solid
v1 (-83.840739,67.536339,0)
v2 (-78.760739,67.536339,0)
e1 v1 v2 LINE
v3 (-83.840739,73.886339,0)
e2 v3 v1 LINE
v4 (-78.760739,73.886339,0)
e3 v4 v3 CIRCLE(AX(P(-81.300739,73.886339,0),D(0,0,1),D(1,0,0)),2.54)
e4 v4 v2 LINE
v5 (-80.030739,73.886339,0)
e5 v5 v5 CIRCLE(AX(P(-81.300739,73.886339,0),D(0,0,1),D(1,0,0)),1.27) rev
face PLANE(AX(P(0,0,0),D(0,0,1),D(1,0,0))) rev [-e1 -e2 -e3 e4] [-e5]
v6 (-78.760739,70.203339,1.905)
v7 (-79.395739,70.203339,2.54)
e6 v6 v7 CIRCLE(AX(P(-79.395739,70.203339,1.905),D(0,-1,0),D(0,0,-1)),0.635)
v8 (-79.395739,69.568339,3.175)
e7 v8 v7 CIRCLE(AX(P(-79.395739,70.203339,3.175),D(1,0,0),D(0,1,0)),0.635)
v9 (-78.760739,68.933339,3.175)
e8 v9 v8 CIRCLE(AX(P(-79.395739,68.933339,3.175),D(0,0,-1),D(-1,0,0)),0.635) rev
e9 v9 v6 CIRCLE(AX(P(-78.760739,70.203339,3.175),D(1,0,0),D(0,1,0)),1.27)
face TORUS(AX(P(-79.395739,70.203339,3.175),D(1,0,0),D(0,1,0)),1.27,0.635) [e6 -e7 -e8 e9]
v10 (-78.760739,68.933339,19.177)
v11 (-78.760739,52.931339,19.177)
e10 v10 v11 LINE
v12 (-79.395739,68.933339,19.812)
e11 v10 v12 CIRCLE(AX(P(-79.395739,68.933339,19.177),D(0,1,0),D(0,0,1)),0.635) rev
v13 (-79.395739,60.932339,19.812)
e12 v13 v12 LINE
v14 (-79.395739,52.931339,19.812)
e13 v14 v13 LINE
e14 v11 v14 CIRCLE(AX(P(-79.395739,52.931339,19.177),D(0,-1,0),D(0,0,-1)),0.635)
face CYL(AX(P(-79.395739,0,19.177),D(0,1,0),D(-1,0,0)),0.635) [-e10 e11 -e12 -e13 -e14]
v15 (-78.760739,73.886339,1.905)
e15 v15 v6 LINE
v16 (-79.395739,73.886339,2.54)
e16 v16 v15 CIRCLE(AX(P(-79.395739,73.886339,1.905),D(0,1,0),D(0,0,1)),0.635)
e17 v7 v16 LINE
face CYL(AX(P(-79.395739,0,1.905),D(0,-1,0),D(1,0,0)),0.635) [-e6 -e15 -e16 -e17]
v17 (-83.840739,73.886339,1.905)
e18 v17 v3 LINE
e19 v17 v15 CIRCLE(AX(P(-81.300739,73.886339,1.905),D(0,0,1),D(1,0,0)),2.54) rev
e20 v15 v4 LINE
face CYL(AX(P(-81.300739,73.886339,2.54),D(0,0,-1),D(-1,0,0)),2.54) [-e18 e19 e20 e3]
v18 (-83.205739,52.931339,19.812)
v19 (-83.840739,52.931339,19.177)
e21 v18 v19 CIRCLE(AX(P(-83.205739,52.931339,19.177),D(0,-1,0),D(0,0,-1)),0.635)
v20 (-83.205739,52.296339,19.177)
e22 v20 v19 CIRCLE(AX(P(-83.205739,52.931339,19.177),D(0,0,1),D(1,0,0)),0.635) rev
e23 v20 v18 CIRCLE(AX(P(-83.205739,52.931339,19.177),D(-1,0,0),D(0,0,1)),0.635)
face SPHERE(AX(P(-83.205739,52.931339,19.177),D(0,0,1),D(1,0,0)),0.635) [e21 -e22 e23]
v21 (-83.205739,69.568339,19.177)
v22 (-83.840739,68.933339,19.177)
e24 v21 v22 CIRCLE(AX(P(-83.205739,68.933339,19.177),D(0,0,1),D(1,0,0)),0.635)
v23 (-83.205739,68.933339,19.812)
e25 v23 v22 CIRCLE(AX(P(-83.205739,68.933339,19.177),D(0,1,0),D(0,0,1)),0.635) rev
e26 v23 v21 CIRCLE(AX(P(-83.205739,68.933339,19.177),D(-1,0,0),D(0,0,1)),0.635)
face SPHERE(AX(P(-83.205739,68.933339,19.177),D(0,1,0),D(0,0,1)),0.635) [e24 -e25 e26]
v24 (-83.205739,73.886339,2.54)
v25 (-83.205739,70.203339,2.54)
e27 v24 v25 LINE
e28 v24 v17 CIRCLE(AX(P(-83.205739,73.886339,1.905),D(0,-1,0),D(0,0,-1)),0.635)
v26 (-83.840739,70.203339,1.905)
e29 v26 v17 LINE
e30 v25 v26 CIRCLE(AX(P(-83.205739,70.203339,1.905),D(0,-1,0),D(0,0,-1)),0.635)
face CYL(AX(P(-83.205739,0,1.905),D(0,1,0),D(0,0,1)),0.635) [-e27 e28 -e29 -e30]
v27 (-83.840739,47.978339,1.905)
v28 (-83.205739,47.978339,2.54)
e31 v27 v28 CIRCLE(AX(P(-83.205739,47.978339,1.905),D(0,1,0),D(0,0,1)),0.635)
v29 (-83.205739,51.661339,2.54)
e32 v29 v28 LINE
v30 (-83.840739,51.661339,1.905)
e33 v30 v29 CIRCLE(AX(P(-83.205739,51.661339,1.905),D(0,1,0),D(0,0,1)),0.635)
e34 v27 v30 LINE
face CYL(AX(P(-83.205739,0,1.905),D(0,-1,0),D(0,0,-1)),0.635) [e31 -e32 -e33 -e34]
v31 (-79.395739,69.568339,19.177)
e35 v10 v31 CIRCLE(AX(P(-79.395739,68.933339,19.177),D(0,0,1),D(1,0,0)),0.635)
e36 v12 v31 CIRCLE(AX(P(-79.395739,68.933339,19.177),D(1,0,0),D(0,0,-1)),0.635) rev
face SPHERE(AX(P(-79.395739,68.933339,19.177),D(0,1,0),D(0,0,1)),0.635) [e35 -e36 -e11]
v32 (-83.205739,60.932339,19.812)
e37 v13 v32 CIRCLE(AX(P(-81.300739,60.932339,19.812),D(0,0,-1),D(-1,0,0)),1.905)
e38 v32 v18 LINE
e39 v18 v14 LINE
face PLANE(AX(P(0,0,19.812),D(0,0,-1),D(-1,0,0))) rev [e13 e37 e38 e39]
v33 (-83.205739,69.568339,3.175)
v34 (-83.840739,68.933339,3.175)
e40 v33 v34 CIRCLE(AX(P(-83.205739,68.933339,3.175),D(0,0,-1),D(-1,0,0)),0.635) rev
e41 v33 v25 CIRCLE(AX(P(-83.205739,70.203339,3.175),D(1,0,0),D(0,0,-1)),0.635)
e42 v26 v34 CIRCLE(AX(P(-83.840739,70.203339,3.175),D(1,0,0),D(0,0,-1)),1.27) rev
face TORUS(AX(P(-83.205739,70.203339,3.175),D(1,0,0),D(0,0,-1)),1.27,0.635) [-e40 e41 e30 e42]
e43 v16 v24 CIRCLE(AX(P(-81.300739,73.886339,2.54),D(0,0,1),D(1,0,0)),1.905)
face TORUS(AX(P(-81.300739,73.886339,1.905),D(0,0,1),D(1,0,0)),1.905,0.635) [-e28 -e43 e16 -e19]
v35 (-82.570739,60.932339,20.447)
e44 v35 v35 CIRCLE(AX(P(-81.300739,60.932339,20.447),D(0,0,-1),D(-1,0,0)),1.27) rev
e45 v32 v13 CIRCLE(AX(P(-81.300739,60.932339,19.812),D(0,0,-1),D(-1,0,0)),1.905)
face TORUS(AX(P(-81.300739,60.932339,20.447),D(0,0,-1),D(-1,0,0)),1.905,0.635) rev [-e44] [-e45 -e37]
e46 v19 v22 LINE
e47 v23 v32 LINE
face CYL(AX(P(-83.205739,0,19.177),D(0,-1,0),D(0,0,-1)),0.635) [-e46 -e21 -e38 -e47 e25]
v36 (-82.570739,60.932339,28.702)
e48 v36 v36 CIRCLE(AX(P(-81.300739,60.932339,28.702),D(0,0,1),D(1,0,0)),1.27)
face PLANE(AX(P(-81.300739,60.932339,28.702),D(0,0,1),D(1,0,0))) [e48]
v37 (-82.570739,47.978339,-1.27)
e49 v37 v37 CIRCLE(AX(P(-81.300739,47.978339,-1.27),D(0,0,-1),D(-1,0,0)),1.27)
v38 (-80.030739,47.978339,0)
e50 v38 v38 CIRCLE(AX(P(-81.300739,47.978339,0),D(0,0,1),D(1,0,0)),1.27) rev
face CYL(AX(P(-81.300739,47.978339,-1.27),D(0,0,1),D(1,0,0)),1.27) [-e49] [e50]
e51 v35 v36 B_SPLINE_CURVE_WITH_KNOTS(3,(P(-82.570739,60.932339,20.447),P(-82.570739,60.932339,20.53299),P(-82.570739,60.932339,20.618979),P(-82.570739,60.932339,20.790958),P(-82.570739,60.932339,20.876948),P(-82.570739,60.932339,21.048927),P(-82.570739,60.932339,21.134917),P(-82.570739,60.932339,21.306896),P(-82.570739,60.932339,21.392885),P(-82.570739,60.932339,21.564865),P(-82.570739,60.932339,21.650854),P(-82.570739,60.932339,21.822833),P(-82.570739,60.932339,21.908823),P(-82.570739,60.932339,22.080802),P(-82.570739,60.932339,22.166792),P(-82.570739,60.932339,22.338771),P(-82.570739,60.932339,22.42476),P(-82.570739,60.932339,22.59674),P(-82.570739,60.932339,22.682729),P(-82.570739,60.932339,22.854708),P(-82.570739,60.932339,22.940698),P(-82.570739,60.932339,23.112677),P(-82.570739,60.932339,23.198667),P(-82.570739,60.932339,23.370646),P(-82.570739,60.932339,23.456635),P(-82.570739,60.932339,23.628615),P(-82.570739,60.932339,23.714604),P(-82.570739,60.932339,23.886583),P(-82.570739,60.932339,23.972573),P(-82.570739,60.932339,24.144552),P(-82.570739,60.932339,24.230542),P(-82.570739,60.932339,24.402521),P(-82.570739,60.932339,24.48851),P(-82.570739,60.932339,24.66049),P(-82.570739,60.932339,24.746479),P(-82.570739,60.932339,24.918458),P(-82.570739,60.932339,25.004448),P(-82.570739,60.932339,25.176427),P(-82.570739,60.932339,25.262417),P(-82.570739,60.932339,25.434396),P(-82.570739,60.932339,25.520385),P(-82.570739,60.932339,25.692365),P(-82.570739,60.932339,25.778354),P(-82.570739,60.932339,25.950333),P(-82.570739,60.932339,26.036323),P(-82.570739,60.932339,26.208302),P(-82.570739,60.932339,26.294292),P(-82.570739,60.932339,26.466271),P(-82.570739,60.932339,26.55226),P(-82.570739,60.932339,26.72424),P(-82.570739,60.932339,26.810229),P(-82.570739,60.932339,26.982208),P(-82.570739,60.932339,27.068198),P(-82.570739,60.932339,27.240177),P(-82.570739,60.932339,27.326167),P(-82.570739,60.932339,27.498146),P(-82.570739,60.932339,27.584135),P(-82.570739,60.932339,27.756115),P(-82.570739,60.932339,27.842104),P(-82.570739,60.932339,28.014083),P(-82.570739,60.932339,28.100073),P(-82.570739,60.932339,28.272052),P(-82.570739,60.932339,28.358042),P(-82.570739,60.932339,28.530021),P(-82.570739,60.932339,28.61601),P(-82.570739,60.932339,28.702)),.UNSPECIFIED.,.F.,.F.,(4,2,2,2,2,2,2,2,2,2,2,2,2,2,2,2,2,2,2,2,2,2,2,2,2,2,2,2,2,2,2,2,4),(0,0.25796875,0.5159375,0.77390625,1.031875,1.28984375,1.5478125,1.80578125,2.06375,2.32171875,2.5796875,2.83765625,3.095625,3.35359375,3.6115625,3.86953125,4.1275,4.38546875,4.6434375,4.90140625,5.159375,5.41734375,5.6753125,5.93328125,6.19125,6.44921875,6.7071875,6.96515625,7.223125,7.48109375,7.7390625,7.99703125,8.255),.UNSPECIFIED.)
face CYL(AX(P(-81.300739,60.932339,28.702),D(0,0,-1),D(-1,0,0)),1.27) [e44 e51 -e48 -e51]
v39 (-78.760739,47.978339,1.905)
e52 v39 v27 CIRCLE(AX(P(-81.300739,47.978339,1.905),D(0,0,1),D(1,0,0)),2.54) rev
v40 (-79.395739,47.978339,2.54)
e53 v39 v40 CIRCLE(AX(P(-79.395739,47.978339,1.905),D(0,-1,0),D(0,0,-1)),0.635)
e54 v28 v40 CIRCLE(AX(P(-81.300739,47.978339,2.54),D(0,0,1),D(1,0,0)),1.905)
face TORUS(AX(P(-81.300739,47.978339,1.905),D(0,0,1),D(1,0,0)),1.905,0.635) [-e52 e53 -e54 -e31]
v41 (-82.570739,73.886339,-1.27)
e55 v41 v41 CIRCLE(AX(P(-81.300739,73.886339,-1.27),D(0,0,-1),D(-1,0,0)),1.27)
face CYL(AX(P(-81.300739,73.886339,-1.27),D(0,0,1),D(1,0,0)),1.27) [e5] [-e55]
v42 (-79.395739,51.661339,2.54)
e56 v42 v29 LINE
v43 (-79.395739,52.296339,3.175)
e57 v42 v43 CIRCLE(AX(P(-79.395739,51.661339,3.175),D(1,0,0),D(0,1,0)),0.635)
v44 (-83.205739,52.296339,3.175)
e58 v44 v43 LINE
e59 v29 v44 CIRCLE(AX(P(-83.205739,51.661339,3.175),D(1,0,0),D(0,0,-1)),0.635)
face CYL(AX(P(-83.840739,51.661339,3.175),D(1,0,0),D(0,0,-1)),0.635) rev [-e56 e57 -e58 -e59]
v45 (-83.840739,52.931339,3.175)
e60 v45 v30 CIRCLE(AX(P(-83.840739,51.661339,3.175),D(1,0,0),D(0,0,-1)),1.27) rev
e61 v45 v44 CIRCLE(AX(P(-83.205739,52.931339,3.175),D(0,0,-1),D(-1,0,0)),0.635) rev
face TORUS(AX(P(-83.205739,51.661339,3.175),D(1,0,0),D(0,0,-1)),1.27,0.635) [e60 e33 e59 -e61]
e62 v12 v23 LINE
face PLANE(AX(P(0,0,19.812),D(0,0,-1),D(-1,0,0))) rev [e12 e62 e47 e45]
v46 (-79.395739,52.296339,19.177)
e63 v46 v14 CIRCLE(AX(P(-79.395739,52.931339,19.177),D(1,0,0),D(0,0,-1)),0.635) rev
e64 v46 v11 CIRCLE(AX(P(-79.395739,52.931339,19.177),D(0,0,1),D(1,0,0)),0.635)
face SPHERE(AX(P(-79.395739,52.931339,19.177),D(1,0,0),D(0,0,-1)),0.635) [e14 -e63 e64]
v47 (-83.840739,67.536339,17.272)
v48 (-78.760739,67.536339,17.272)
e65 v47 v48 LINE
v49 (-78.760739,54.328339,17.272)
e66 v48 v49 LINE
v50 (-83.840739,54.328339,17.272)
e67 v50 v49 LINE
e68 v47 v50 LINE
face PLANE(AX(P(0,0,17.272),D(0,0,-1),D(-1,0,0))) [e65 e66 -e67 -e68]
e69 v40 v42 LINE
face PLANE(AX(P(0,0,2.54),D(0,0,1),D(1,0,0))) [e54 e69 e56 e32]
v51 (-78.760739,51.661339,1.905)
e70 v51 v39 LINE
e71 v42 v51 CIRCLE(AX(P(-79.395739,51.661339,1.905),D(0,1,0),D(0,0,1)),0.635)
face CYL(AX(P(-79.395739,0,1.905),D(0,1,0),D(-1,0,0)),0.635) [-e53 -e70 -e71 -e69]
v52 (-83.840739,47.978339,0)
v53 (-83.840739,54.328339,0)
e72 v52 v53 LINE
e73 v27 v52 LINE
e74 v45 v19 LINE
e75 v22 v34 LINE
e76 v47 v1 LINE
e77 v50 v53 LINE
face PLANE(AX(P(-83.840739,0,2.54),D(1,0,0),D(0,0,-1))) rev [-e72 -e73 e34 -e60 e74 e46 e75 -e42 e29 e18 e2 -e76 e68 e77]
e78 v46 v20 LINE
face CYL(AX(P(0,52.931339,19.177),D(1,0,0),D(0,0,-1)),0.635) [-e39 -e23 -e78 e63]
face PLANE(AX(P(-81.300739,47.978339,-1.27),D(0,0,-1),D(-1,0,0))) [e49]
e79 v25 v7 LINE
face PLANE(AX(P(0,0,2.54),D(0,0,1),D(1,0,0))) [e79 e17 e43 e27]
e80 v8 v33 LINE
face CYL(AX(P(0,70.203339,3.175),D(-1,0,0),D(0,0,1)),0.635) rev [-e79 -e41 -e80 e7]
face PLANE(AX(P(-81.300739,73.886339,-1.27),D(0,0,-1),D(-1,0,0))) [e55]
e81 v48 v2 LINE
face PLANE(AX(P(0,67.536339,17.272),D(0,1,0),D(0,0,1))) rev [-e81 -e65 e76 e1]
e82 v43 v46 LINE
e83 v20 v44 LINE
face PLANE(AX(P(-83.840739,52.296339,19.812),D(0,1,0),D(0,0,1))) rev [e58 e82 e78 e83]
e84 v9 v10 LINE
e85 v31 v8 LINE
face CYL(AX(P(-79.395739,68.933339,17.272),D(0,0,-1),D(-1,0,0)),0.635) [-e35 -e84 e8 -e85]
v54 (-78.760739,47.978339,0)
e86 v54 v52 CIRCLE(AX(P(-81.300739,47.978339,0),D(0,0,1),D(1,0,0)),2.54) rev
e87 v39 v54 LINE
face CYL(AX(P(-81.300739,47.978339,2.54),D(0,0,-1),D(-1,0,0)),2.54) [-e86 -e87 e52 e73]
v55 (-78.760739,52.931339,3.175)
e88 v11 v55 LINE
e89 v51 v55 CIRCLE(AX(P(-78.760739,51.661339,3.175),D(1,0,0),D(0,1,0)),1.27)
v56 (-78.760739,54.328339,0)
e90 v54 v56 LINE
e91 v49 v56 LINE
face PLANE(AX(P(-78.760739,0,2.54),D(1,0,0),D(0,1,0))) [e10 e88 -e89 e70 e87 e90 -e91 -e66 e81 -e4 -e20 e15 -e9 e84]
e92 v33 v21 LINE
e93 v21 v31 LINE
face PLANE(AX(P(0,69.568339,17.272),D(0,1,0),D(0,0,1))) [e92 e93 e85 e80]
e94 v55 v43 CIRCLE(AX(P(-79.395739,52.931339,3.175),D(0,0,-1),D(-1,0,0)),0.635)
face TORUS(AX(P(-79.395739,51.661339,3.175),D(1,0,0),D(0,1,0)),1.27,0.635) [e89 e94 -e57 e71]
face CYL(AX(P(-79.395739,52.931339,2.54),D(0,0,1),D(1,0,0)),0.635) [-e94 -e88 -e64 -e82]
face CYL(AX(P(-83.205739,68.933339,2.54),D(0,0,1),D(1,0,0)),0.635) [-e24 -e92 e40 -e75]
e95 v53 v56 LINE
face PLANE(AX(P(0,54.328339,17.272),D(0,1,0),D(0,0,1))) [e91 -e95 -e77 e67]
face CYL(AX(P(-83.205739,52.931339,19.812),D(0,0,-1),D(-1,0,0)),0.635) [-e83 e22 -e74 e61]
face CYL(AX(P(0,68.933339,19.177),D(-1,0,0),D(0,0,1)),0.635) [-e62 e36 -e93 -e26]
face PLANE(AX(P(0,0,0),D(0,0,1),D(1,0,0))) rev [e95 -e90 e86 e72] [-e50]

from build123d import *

# Parameters (mm, degrees)
BOSS_EXTRUDE1_DEPTH = 2.54
SKETCH1_7_W         = 5.08
SKETCH1_7_H         = 2.032
BOSS_EXTRUDE2_DEPTH = 17.272
SKETCH2_W           = 5.08
SKETCH2_H           = 17.272
BOSS_EXTRUDE3_DEPTH = 2.54
SKETCH3_R           = 1.27
BOSS_EXTRUDE4_DEPTH = 8.89
FILLET1_R           = 0.635
SKETCH4_R           = 1.27
BOSS_EXTRUDE5_DEPTH = 1.27


with BuildPart() as part:
    # Sketch1 → Boss-Extrude1 (new body)
    with BuildSketch(Plane.XY):
        with BuildLine():
            ThreePointArc((-78.760738581, 73.886338755), (-81.300738581, 71.346338755), (-83.840738581, 73.886338755))
            Line((-83.840738581, 73.886338755), (-83.840738581, 69.568338755))
            Line((-83.840738581, 69.568338755), (-78.760738581, 69.568338755))
            Line((-78.760738581, 69.568338755), (-78.760738581, 73.886338755))
        make_face()
        with BuildLine():
            ThreePointArc((-78.760738581, 73.886338755), (-81.300738581, 76.426338755), (-83.840738581, 73.886338755))
            Line((-83.840738581, 73.886338755), (-78.760738581, 73.886338755))
        make_face()
        with BuildLine():
            Line((-78.760738581, 73.886338755), (-83.840738581, 73.886338755))
            ThreePointArc((-83.840738581, 73.886338755), (-81.300738581, 71.346338755), (-78.760738581, 73.886338755))
        make_face()
        with BuildLine():
            ThreePointArc((-78.760738581, 47.978338755), (-81.300738581, 50.518338755), (-83.840738581, 47.978338755))
            Line((-83.840738581, 47.978338755), (-78.760738581, 47.978338755))
        make_face()
        with BuildLine():
            Line((-78.760738581, 47.978338755), (-83.840738581, 47.978338755))
            ThreePointArc((-83.840738581, 47.978338755), (-81.300738581, 45.438338755), (-78.760738581, 47.978338755))
        make_face()
        with BuildLine():
            Line((-78.760738581, 52.296338755), (-83.840738581, 52.296338755))
            Line((-83.840738581, 52.296338755), (-83.840738581, 47.978338755))
            ThreePointArc((-83.840738581, 47.978338755), (-81.300738581, 50.518338755), (-78.760738581, 47.978338755))
            Line((-78.760738581, 47.978338755), (-78.760738581, 52.296338755))
        make_face()
    extrude(amount=BOSS_EXTRUDE1_DEPTH)

    # Sketch1<7> → Boss-Extrude2 (add)
    with BuildSketch(Plane.XY):
        with Locations((-81.300738581, 53.312338755)):
            Rectangle(SKETCH1_7_W, SKETCH1_7_H)
        Polygon((-78.760738581, 69.568338755), (-83.840738581, 69.568338755), (-83.840738581, 67.536338755), (-82.574456105, 67.536338755), (-78.760738581, 67.536338755), align=None)
    extrude(amount=BOSS_EXTRUDE2_DEPTH)

    # Sketch2 → Boss-Extrude3 (add)
    with BuildSketch(Plane.XY.offset(17.272)):
        with Locations((-81.300738581, 60.932338755)):
            Rectangle(SKETCH2_W, SKETCH2_H)
    extrude(amount=BOSS_EXTRUDE3_DEPTH)

    # Sketch3 → Boss-Extrude4 (add)
    with BuildSketch(Plane.XY.offset(19.812)):
        with Locations(Location((-81.300738581, 60.932338755, 0), (0, 0, 180))):
            Circle(SKETCH3_R)
    extrude(amount=BOSS_EXTRUDE4_DEPTH)

    # Fillet1
    fillet1_edges = [part.edges().sort_by_distance(p)[0] for p in [
        (-81.300738581, 76.426338755, 2.54),
        (-83.840738581, 71.727338755, 2.54),
        (-78.760738581, 69.568338755, 11.176),
        (-83.840738581, 69.568338755, 11.176),
        (-81.300738581, 69.568338755, 2.54),
        (-83.840738581, 52.296338755, 11.176),
        (-78.760738581, 60.932338755, 19.812),
        (-78.760738581, 52.296338755, 11.176),
        (-81.300738581, 69.568338755, 19.812),
        (-81.300738581, 52.296338755, 19.812),
        (-83.840738581, 60.932338755, 19.812),
        (-81.300738581, 45.438338755, 2.54),
        (-83.840738581, 50.137338755, 2.54),
        (-78.760738581, 50.137338755, 2.54),
        (-81.300738581, 52.296338755, 2.54),
        (-78.760738581, 71.727338755, 2.54),
        (-80.030738581, 60.932338755, 19.812),
    ]]
    fillet(fillet1_edges, radius=FILLET1_R - 0.0001)  # a hair under: the kernel refuses the full size

    # Sketch4 → Boss-Extrude5 (add)
    with BuildSketch(Plane(origin=(0, 0, 0), x_dir=(-1, 0, 0), z_dir=(0, 0, -1))):
        with Locations(Location((81.300738581, 73.886338755, 0), (0, 0, 180))):
            Circle(SKETCH4_R)
        with Locations(Location((81.300738581, 47.978338755, 0), (0, 0, 180))):
            Circle(SKETCH4_R)
    extrude(amount=BOSS_EXTRUDE5_DEPTH)


solid = part.part
